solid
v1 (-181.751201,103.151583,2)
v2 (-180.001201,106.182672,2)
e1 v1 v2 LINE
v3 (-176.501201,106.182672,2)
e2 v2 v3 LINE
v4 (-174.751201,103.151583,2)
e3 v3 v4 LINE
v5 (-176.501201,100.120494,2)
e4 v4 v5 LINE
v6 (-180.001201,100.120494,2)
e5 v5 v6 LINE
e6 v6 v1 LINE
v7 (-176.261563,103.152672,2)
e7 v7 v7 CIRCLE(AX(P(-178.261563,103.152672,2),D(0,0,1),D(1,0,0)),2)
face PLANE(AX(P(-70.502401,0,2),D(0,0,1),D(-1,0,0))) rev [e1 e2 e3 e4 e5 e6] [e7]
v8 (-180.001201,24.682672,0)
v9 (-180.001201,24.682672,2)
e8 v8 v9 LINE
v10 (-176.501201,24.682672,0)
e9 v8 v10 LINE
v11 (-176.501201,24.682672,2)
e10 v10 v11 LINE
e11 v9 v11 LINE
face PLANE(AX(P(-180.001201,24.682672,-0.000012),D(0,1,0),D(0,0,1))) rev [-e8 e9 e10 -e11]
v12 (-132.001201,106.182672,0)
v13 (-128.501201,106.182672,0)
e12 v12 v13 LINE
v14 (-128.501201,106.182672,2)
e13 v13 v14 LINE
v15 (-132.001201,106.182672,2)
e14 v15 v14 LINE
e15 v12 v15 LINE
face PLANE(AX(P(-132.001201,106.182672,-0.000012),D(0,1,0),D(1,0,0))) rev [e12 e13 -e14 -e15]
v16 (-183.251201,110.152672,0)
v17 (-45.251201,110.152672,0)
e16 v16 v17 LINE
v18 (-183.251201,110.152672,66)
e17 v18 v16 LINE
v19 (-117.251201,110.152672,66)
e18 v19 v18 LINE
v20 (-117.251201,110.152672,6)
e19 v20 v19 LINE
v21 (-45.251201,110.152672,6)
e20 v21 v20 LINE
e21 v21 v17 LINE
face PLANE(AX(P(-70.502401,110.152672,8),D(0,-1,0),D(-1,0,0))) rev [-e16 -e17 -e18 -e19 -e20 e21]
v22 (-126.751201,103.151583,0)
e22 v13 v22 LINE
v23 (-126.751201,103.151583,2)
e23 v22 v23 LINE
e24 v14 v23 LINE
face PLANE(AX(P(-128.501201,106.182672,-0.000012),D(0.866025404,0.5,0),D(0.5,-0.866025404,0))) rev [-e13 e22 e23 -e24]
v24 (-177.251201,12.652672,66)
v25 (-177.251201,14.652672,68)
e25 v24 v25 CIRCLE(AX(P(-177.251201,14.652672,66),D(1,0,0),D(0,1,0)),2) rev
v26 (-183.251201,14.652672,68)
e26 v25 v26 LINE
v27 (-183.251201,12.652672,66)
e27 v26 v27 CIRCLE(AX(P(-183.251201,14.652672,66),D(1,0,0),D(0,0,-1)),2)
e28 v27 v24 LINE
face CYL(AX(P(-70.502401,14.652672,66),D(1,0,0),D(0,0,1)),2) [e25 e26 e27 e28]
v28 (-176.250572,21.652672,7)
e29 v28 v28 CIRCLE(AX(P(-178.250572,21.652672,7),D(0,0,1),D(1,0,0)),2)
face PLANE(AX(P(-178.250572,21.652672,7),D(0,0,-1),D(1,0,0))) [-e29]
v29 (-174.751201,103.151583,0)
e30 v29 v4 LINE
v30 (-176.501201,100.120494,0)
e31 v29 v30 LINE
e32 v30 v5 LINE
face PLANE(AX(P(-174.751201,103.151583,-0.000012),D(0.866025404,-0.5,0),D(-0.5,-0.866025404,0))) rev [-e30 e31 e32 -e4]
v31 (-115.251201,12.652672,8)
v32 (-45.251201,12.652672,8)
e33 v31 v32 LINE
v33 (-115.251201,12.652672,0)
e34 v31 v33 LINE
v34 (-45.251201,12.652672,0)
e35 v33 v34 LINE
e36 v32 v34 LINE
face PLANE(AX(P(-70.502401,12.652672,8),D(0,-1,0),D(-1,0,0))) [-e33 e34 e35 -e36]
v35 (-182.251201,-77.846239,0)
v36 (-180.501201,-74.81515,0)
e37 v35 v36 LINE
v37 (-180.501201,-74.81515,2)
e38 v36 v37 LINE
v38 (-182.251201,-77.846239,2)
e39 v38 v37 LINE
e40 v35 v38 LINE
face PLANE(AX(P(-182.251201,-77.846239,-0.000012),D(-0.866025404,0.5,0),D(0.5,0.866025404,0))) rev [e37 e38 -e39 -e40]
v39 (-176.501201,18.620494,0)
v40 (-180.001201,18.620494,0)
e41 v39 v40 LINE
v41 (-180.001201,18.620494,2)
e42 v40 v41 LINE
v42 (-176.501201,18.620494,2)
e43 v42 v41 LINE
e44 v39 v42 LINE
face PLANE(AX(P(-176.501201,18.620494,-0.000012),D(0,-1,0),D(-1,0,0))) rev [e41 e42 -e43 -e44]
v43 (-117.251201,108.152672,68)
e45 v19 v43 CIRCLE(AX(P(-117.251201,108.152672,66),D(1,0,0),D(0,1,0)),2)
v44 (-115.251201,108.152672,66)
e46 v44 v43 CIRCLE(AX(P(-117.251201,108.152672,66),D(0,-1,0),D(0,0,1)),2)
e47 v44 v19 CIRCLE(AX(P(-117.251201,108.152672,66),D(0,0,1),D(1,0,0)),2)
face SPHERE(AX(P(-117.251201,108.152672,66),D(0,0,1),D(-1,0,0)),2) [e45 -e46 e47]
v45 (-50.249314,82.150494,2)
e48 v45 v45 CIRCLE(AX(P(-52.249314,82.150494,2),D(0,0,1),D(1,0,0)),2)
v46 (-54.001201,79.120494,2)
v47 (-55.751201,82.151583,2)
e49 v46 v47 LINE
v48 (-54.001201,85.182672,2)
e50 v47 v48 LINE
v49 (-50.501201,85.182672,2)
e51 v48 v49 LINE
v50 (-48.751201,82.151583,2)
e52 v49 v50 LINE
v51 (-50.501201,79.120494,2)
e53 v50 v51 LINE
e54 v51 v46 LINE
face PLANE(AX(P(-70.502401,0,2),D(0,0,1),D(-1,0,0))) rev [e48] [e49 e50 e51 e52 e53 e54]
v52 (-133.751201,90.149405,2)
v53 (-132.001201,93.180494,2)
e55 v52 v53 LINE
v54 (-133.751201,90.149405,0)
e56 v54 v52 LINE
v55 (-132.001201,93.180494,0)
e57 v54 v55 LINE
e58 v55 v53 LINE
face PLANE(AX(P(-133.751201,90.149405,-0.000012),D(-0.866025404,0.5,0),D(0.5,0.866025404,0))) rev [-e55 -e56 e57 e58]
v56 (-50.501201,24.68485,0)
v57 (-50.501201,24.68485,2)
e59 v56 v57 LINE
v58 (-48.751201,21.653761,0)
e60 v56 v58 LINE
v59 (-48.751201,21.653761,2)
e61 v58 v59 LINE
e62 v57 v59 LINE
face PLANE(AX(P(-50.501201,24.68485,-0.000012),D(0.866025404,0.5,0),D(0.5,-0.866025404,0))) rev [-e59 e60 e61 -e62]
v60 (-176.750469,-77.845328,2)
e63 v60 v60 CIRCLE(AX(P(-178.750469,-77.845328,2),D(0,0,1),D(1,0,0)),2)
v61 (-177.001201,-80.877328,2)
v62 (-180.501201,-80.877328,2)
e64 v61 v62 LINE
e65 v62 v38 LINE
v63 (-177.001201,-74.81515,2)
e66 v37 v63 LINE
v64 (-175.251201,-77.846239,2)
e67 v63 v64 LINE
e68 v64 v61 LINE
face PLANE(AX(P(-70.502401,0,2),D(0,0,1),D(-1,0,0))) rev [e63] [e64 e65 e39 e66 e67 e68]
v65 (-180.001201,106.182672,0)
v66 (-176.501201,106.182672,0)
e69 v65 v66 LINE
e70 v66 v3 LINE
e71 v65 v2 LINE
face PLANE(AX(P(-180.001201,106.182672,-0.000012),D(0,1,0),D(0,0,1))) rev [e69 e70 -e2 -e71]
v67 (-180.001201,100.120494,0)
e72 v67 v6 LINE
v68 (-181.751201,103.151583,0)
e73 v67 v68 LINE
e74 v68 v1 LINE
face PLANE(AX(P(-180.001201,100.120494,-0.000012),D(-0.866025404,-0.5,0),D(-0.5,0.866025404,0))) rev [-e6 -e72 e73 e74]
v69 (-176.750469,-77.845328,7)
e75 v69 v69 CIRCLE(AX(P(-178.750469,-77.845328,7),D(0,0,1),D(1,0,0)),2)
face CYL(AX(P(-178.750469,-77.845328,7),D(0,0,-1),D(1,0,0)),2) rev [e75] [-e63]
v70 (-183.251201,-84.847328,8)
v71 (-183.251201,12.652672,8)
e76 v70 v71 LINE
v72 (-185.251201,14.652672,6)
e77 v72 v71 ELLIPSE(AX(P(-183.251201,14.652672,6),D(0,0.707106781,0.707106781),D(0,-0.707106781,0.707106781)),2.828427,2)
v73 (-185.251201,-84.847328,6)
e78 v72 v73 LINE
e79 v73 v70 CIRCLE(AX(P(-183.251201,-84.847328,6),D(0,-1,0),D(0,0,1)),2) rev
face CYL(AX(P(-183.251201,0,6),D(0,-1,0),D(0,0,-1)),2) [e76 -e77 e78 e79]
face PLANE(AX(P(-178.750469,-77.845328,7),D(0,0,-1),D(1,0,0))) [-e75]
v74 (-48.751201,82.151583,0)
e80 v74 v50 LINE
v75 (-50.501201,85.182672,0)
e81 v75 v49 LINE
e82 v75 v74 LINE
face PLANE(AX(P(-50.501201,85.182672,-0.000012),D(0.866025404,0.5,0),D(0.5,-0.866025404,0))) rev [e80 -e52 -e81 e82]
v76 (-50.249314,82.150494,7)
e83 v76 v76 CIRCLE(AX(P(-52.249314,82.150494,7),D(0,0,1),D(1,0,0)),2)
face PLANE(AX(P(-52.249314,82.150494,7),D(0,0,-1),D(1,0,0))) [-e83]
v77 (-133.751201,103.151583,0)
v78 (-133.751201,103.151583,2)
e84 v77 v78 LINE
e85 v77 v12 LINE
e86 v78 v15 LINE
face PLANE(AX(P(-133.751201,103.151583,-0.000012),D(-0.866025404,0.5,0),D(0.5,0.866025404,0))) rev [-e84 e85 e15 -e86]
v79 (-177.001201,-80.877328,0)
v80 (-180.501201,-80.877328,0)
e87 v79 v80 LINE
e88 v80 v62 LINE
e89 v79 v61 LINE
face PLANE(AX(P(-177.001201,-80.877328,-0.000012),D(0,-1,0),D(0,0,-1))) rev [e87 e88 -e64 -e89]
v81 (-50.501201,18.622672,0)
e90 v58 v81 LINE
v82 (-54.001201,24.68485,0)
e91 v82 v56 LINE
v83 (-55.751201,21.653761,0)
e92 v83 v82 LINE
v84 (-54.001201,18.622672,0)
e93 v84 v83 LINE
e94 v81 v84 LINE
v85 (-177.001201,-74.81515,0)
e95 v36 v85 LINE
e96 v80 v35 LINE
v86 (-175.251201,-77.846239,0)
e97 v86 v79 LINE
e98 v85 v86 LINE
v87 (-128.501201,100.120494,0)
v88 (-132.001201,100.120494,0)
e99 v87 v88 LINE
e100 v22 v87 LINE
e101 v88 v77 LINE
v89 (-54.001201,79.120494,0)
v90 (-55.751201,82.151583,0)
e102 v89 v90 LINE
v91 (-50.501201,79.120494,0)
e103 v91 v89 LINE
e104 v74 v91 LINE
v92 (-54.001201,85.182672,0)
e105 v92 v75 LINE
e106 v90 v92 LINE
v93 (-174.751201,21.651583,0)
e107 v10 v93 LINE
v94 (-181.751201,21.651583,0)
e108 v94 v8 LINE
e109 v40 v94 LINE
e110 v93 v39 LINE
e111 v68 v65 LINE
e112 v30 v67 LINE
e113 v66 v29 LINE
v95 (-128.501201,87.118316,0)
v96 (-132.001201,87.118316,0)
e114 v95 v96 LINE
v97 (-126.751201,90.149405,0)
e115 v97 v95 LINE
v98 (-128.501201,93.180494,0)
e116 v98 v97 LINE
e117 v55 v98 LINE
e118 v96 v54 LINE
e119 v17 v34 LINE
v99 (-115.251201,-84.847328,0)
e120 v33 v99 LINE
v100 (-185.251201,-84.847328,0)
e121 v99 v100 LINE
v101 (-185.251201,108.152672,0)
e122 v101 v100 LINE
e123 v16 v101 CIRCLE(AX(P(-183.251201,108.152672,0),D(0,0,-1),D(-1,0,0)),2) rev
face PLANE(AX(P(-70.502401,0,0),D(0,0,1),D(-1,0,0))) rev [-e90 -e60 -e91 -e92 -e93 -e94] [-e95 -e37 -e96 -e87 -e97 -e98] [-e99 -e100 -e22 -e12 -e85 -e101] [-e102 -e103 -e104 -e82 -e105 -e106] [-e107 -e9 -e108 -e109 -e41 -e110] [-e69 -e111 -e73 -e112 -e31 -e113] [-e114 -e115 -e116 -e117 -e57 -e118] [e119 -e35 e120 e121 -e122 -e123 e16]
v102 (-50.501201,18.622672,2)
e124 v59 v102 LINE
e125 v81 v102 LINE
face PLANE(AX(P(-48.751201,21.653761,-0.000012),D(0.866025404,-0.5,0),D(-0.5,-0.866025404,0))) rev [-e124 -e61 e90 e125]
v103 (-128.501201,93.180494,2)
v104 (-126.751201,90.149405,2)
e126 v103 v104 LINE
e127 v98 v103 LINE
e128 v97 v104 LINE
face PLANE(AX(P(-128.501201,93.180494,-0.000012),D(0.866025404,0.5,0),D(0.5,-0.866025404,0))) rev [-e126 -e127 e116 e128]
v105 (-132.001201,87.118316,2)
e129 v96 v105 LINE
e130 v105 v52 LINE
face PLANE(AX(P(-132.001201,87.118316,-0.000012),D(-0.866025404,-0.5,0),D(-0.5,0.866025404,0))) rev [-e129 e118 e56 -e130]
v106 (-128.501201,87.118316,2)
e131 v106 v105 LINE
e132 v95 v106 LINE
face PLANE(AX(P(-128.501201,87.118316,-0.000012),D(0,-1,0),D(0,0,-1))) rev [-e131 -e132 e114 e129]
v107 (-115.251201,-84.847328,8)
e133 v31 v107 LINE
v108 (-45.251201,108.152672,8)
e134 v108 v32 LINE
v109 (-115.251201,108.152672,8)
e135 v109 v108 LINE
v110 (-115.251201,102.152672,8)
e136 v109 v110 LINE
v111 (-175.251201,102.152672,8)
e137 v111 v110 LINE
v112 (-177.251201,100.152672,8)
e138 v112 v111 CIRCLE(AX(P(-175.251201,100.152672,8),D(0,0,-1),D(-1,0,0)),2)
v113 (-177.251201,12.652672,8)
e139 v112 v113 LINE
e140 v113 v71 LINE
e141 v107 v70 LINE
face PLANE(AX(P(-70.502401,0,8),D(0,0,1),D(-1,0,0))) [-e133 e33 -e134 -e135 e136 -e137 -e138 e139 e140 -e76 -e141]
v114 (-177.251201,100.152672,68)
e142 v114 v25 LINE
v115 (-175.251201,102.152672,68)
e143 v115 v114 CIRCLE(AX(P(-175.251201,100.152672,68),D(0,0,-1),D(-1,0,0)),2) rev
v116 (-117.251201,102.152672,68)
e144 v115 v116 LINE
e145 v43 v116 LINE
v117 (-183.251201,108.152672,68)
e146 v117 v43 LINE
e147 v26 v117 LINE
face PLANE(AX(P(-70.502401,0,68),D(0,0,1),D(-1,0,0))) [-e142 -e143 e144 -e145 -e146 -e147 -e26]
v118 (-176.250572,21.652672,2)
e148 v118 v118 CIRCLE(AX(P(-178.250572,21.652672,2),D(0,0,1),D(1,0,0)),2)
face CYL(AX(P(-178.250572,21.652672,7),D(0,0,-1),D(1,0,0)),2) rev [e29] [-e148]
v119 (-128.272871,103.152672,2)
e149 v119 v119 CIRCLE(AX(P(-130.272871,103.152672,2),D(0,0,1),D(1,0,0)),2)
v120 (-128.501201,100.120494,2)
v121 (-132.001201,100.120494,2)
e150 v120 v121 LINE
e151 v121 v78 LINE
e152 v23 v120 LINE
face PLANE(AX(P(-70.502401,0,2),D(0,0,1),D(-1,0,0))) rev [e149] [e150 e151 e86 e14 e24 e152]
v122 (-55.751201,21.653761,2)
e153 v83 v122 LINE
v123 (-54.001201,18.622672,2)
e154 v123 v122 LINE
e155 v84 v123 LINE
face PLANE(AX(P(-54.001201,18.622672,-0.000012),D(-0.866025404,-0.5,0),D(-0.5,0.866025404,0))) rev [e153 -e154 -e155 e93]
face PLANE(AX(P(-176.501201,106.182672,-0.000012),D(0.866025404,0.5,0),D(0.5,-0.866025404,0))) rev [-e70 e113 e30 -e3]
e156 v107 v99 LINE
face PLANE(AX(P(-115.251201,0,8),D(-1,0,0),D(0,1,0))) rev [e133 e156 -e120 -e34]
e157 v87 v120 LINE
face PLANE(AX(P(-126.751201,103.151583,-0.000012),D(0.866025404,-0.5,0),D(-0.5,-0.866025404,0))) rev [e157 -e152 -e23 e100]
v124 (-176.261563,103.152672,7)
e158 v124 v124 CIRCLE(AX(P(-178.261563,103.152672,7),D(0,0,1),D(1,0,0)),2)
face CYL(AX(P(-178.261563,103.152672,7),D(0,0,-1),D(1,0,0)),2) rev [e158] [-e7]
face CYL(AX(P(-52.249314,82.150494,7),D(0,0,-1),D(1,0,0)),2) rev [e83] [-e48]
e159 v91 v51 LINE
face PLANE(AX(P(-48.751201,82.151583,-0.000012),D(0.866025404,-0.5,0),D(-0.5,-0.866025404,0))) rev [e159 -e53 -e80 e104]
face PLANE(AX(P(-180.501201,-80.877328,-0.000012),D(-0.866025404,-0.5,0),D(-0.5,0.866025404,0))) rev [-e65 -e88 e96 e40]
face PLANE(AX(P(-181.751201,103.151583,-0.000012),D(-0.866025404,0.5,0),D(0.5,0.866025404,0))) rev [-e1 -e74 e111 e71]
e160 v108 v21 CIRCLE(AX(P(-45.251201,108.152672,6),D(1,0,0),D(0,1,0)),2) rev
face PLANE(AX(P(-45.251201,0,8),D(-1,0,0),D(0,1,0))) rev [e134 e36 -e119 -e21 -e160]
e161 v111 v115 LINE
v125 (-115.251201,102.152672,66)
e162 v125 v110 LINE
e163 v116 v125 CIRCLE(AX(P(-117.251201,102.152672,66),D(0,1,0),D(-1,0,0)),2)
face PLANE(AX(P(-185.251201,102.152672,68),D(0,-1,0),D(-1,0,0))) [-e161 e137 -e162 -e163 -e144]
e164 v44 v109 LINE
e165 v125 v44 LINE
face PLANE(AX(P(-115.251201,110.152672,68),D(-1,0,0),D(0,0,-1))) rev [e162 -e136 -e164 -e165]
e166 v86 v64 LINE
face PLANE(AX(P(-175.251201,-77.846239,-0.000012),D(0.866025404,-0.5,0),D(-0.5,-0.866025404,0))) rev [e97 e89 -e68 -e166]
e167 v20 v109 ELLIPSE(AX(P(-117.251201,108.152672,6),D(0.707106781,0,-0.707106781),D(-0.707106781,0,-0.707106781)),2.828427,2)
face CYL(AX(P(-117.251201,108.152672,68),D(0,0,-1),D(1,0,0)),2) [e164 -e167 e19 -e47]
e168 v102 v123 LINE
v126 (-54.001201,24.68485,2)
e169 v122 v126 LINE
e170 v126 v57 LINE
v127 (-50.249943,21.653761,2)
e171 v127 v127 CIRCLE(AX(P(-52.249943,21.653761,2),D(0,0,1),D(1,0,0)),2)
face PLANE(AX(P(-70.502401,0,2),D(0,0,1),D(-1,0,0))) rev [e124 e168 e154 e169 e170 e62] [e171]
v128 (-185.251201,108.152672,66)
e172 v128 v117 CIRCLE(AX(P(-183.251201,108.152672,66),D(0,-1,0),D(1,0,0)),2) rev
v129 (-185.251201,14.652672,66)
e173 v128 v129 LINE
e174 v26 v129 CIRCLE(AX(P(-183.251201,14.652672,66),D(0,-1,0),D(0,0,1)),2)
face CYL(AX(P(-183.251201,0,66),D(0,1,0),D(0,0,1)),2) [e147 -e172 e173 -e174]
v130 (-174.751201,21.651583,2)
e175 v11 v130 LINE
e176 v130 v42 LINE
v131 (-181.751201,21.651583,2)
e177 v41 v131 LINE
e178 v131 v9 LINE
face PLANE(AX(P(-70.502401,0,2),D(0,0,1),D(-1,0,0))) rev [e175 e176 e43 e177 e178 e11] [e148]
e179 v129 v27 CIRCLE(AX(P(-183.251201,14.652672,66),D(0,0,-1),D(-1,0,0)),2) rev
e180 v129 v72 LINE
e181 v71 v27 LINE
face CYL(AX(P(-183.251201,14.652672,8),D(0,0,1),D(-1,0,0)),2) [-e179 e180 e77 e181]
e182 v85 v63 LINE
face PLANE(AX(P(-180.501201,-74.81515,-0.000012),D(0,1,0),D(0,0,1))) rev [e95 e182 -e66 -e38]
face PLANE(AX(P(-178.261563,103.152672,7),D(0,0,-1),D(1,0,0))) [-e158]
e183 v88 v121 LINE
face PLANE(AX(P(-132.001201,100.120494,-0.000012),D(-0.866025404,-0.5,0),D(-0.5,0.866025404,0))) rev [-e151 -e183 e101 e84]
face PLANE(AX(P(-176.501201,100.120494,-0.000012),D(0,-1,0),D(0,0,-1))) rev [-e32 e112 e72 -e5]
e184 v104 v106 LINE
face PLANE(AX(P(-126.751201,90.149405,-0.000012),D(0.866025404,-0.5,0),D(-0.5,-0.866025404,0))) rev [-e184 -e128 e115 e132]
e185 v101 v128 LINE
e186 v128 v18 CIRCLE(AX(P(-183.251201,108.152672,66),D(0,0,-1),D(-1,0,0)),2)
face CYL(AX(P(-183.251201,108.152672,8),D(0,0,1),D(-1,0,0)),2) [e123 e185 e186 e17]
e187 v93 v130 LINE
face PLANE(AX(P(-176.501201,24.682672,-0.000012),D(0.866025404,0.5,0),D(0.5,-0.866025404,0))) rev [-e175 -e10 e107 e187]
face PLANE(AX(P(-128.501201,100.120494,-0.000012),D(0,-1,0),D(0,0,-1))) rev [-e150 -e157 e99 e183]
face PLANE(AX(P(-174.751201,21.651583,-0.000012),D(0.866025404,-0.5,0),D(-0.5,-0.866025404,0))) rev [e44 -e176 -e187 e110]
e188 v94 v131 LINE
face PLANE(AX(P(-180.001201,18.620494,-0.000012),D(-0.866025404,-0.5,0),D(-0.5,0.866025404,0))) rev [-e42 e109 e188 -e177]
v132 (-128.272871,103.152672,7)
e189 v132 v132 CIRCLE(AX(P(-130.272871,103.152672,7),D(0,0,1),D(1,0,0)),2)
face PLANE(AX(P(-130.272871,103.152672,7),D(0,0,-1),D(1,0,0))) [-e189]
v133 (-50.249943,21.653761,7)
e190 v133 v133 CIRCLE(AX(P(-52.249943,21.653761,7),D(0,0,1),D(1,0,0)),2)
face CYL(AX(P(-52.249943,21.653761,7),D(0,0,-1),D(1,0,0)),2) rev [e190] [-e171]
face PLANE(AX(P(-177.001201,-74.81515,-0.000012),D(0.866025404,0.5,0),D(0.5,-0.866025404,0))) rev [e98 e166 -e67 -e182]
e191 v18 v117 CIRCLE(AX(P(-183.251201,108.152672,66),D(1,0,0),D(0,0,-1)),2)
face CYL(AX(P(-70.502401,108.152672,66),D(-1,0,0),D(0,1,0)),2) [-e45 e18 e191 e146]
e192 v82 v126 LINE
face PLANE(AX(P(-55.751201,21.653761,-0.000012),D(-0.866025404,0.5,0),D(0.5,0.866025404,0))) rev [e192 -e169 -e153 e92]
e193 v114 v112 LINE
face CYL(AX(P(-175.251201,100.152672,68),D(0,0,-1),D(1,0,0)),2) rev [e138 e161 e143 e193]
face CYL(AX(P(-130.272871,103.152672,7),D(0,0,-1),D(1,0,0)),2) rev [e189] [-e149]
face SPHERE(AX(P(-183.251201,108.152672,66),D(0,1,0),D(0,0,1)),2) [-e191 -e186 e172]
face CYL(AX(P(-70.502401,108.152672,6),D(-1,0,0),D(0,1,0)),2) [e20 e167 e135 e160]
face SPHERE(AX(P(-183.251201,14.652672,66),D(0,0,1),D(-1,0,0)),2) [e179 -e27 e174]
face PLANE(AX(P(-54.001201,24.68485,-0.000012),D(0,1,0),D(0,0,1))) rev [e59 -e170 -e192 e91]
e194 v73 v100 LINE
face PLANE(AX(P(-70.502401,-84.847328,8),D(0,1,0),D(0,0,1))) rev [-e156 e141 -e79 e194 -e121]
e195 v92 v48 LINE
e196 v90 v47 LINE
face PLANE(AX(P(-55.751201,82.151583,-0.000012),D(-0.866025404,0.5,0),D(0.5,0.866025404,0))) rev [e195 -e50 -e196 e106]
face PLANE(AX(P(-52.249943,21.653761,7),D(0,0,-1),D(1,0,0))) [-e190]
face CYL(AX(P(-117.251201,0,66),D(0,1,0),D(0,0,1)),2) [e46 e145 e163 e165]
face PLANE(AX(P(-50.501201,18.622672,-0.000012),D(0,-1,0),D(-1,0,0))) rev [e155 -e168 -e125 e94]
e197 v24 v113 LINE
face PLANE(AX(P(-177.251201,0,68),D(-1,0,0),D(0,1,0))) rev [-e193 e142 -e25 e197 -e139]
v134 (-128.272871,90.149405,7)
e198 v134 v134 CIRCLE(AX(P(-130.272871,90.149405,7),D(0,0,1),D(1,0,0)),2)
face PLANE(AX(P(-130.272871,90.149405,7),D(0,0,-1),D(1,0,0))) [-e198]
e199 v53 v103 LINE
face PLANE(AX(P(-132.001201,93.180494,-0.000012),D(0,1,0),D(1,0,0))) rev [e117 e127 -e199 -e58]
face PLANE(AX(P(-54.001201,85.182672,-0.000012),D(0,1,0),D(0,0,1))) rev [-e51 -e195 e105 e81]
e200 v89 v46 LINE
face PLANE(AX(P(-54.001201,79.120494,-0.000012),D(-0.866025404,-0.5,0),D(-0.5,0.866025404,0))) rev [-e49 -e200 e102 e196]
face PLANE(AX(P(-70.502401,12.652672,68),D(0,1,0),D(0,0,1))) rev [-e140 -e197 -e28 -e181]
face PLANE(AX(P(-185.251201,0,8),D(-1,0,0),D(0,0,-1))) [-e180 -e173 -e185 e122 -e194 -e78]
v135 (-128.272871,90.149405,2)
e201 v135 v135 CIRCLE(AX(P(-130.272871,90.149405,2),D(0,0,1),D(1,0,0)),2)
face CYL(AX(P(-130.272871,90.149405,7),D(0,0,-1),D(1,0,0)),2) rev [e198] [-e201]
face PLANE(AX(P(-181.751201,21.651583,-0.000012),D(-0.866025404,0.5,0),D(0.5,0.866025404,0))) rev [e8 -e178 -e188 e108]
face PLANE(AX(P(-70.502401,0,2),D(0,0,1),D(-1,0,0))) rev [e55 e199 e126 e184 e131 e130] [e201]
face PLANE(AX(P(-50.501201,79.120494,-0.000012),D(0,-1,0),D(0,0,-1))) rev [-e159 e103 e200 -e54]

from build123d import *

# Parameters (mm, degrees)
EXTRUDE_1_DEPTH          = 8
CUT_EXTRUDE_2_DEPTH      = 2
CUT_EXTRUDE_2_DEPTH_BACK = 160.263611885
SKETCH_4_R               = 2
CUT_EXTRUDE_7_DEPTH      = 5
SKETCH_5_W               = 8
SKETCH_5_H               = 89.5
EXTRUDE_3_DEPTH          = 60
FILLET_1_R               = 2
FILLET_2_R               = 2
FILLET_3_R               = 2


with BuildPart() as part:
    # 스케치1 → 보스-돌출1 (new body)
    with BuildSketch(Plane.XY):
        Polygon((114.748799453, 110.152671756), (44.748799453, 110.152671756), (-25.251200547, 110.152671756), (-25.251200547, 12.652671756), (44.748799453, 12.652671756), (44.748799453, -84.847328244), (114.748799453, -84.847328244), (114.748799453, 12.652671756), align=None)
    extrude(amount=EXTRUDE_1_DEPTH)

    # 스케치3 → 컷-돌출2 (cut, two sides: drawn at the far end of the back side and taken through both)
    with BuildSketch(Plane.XY.offset(-CUT_EXTRUDE_2_DEPTH_BACK)):
        Polygon((104.248799453, 103.151582842), (105.998799453, 100.120493929), (109.498799453, 100.120493929), (111.248799453, 103.151582842), (109.498799453, 106.182671756), (105.998799453, 106.182671756), align=None)
        Polygon((-21.751200547, 82.151582842), (-20.001200547, 79.120493929), (-16.501200547, 79.120493929), (-14.751200547, 82.151582842), (-16.501200547, 85.182671756), (-20.001200547, 85.182671756), align=None)
        Polygon((-21.751200547, 21.653760669), (-20.001200547, 18.622671756), (-16.501200547, 18.622671756), (-14.751200547, 21.653760669), (-16.501200547, 24.684849582), (-20.001200547, 24.684849582), align=None)
        Polygon((57.998799453, 100.120493929), (61.498799453, 100.120493929), (63.248799453, 103.151582842), (61.498799453, 106.182671756), (57.998799453, 106.182671756), (56.248799453, 103.151582842), align=None)
        Polygon((57.998799453, 93.180493929), (56.248799453, 90.149405016), (57.998799453, 87.118316103), (61.498799453, 87.118316103), (63.248799453, 90.149405016), (61.498799453, 93.180493929), align=None)
        Polygon((104.748799453, -77.846239331), (106.498799453, -80.877328244), (109.998799453, -80.877328244), (111.748799453, -77.846239331), (109.998799453, -74.815150418), (106.498799453, -74.815150418), align=None)
        Polygon((109.498799453, 18.620493929), (111.248799453, 21.651582842), (109.498799453, 24.682671756), (105.998799453, 24.682671756), (104.248799453, 21.651582842), (105.998799453, 18.620493929), align=None)
    extrude(amount=CUT_EXTRUDE_2_DEPTH + CUT_EXTRUDE_2_DEPTH_BACK, mode=Mode.SUBTRACT)

    # 스케치4 → 컷-돌출7 (cut)
    with BuildSketch(Plane(origin=(0, 0, 2), x_dir=(-1, 0, 0), z_dir=(0, 0, -1))):
        with Locations((-59.770469927, 103.152671756)):
            Circle(SKETCH_4_R)
        with Locations((-59.770469927, 90.149405016)):
            Circle(SKETCH_4_R)
        with Locations((-107.759162368, 103.152671756)):
            Circle(SKETCH_4_R)
        with Locations((-108.2480681, -77.845328244)):
            Circle(SKETCH_4_R)
        with Locations((-107.748170768, 21.652671756)):
            Circle(SKETCH_4_R)
        with Locations((18.252457916, 21.653760669)):
            Circle(SKETCH_4_R)
        with Locations((18.2530866, 82.150493929)):
            Circle(SKETCH_4_R)
    extrude(amount=-CUT_EXTRUDE_7_DEPTH, mode=Mode.SUBTRACT)

    # 스케치5 → 보스-돌출3 (add)
    with BuildSketch(Plane.XY.offset(8)):
        Polygon((114.748799453, 102.152671756), (114.748799453, 110.152671756), (44.748799453, 110.152671756), (44.748799453, 102.152671756), (106.748799453, 102.152671756), align=None)
        with Locations((110.748799453, 57.402671756)):
            Rectangle(SKETCH_5_W, SKETCH_5_H)
    extrude(amount=EXTRUDE_3_DEPTH)

    # 필렛1
    fillet_1_edges = [part.edges().sort_by_distance(p)[0] for p in [
        (114.748799453, 110.152671756, 34),
        (9.748799453, 110.152671756, 8),
        (114.748799453, -36.097328244, 8),
        (114.748799453, 61.402671756, 68),
        (79.748799453, 110.152671756, 68),
        (114.748799453, 12.652671756, 38),
        (44.748799453, 110.152671756, 38),
    ]]
    fillet(fillet_1_edges, radius=FILLET_1_R)

    # 필렛2
    # the kernel refuses this fillet: 2 mm, written as the material it takes off along each edge
    with BuildSketch(Plane(origin=(46.748799453, 108.152671756, 66), x_dir=(0, 0, 1), z_dir=(-1, 0, 0))) as fillet_2_piece_1_section:
        Polygon((0, 0), (FILLET_2_R, 0), (FILLET_2_R, FILLET_2_R), (0, FILLET_2_R), align=None)
    fillet_2_piece_1 = extrude(amount=FILLET_2_R, mode=Mode.PRIVATE)
    fillet_2_piece_1 = fillet_2_piece_1 - Plane(origin=(46.748799453, 108.152671756, 66), x_dir=(0, -0.7071067811865475, -0.7071067811865475), z_dir=(-1, 0, 0)) * Sphere(FILLET_2_R, mode=Mode.PRIVATE)
    add(fillet_2_piece_1, mode=Mode.SUBTRACT)
    with BuildSketch(Plane(origin=(112.748799453, 14.652671756, 66), x_dir=(0, 0, 1), z_dir=(0, -1, 0))) as fillet_2_piece_2_section:
        Polygon((0, 0), (FILLET_2_R, 0), (FILLET_2_R, -FILLET_2_R), (0, -FILLET_2_R), align=None)
    fillet_2_piece_2 = extrude(amount=FILLET_2_R, mode=Mode.PRIVATE)
    fillet_2_piece_2 = fillet_2_piece_2 - Plane(origin=(112.748799453, 14.652671756, 66), x_dir=(-0.7071067811865475, 0, -0.7071067811865475), z_dir=(0, -1, 0)) * Sphere(FILLET_2_R, mode=Mode.PRIVATE)
    add(fillet_2_piece_2, mode=Mode.SUBTRACT)
    with BuildSketch(Plane(origin=(101.748799453, 12.652671756, 68), x_dir=(0, 0, -1), z_dir=(1, 0, 0)), Plane(origin=(44.748799453, 108.152671756, 68), x_dir=(0, 0, -1), z_dir=(0, -1, 0))) as fillet_2_piece_3:
        with BuildLine():
            CenterArc((FILLET_2_R, FILLET_2_R), FILLET_2_R, 180, 90)
            Line((0, FILLET_2_R), (0, 0))
            Line((0, 0), (FILLET_2_R, 0))
        make_face()
    extrude(amount=11, mode=Mode.SUBTRACT)

    # 필렛3
    fillet_3_edges = [part.edges().sort_by_distance(p)[0] for p in [
        (106.748799453, 102.152671756, 38),
    ]]
    fillet(fillet_3_edges, radius=FILLET_3_R)


with BuildPart() as body_2:
    # 대칭 복사1: mirrored copy
    add(part.part.mirror(Plane.ZY.offset(35.251200547)))


solid = body_2.part
